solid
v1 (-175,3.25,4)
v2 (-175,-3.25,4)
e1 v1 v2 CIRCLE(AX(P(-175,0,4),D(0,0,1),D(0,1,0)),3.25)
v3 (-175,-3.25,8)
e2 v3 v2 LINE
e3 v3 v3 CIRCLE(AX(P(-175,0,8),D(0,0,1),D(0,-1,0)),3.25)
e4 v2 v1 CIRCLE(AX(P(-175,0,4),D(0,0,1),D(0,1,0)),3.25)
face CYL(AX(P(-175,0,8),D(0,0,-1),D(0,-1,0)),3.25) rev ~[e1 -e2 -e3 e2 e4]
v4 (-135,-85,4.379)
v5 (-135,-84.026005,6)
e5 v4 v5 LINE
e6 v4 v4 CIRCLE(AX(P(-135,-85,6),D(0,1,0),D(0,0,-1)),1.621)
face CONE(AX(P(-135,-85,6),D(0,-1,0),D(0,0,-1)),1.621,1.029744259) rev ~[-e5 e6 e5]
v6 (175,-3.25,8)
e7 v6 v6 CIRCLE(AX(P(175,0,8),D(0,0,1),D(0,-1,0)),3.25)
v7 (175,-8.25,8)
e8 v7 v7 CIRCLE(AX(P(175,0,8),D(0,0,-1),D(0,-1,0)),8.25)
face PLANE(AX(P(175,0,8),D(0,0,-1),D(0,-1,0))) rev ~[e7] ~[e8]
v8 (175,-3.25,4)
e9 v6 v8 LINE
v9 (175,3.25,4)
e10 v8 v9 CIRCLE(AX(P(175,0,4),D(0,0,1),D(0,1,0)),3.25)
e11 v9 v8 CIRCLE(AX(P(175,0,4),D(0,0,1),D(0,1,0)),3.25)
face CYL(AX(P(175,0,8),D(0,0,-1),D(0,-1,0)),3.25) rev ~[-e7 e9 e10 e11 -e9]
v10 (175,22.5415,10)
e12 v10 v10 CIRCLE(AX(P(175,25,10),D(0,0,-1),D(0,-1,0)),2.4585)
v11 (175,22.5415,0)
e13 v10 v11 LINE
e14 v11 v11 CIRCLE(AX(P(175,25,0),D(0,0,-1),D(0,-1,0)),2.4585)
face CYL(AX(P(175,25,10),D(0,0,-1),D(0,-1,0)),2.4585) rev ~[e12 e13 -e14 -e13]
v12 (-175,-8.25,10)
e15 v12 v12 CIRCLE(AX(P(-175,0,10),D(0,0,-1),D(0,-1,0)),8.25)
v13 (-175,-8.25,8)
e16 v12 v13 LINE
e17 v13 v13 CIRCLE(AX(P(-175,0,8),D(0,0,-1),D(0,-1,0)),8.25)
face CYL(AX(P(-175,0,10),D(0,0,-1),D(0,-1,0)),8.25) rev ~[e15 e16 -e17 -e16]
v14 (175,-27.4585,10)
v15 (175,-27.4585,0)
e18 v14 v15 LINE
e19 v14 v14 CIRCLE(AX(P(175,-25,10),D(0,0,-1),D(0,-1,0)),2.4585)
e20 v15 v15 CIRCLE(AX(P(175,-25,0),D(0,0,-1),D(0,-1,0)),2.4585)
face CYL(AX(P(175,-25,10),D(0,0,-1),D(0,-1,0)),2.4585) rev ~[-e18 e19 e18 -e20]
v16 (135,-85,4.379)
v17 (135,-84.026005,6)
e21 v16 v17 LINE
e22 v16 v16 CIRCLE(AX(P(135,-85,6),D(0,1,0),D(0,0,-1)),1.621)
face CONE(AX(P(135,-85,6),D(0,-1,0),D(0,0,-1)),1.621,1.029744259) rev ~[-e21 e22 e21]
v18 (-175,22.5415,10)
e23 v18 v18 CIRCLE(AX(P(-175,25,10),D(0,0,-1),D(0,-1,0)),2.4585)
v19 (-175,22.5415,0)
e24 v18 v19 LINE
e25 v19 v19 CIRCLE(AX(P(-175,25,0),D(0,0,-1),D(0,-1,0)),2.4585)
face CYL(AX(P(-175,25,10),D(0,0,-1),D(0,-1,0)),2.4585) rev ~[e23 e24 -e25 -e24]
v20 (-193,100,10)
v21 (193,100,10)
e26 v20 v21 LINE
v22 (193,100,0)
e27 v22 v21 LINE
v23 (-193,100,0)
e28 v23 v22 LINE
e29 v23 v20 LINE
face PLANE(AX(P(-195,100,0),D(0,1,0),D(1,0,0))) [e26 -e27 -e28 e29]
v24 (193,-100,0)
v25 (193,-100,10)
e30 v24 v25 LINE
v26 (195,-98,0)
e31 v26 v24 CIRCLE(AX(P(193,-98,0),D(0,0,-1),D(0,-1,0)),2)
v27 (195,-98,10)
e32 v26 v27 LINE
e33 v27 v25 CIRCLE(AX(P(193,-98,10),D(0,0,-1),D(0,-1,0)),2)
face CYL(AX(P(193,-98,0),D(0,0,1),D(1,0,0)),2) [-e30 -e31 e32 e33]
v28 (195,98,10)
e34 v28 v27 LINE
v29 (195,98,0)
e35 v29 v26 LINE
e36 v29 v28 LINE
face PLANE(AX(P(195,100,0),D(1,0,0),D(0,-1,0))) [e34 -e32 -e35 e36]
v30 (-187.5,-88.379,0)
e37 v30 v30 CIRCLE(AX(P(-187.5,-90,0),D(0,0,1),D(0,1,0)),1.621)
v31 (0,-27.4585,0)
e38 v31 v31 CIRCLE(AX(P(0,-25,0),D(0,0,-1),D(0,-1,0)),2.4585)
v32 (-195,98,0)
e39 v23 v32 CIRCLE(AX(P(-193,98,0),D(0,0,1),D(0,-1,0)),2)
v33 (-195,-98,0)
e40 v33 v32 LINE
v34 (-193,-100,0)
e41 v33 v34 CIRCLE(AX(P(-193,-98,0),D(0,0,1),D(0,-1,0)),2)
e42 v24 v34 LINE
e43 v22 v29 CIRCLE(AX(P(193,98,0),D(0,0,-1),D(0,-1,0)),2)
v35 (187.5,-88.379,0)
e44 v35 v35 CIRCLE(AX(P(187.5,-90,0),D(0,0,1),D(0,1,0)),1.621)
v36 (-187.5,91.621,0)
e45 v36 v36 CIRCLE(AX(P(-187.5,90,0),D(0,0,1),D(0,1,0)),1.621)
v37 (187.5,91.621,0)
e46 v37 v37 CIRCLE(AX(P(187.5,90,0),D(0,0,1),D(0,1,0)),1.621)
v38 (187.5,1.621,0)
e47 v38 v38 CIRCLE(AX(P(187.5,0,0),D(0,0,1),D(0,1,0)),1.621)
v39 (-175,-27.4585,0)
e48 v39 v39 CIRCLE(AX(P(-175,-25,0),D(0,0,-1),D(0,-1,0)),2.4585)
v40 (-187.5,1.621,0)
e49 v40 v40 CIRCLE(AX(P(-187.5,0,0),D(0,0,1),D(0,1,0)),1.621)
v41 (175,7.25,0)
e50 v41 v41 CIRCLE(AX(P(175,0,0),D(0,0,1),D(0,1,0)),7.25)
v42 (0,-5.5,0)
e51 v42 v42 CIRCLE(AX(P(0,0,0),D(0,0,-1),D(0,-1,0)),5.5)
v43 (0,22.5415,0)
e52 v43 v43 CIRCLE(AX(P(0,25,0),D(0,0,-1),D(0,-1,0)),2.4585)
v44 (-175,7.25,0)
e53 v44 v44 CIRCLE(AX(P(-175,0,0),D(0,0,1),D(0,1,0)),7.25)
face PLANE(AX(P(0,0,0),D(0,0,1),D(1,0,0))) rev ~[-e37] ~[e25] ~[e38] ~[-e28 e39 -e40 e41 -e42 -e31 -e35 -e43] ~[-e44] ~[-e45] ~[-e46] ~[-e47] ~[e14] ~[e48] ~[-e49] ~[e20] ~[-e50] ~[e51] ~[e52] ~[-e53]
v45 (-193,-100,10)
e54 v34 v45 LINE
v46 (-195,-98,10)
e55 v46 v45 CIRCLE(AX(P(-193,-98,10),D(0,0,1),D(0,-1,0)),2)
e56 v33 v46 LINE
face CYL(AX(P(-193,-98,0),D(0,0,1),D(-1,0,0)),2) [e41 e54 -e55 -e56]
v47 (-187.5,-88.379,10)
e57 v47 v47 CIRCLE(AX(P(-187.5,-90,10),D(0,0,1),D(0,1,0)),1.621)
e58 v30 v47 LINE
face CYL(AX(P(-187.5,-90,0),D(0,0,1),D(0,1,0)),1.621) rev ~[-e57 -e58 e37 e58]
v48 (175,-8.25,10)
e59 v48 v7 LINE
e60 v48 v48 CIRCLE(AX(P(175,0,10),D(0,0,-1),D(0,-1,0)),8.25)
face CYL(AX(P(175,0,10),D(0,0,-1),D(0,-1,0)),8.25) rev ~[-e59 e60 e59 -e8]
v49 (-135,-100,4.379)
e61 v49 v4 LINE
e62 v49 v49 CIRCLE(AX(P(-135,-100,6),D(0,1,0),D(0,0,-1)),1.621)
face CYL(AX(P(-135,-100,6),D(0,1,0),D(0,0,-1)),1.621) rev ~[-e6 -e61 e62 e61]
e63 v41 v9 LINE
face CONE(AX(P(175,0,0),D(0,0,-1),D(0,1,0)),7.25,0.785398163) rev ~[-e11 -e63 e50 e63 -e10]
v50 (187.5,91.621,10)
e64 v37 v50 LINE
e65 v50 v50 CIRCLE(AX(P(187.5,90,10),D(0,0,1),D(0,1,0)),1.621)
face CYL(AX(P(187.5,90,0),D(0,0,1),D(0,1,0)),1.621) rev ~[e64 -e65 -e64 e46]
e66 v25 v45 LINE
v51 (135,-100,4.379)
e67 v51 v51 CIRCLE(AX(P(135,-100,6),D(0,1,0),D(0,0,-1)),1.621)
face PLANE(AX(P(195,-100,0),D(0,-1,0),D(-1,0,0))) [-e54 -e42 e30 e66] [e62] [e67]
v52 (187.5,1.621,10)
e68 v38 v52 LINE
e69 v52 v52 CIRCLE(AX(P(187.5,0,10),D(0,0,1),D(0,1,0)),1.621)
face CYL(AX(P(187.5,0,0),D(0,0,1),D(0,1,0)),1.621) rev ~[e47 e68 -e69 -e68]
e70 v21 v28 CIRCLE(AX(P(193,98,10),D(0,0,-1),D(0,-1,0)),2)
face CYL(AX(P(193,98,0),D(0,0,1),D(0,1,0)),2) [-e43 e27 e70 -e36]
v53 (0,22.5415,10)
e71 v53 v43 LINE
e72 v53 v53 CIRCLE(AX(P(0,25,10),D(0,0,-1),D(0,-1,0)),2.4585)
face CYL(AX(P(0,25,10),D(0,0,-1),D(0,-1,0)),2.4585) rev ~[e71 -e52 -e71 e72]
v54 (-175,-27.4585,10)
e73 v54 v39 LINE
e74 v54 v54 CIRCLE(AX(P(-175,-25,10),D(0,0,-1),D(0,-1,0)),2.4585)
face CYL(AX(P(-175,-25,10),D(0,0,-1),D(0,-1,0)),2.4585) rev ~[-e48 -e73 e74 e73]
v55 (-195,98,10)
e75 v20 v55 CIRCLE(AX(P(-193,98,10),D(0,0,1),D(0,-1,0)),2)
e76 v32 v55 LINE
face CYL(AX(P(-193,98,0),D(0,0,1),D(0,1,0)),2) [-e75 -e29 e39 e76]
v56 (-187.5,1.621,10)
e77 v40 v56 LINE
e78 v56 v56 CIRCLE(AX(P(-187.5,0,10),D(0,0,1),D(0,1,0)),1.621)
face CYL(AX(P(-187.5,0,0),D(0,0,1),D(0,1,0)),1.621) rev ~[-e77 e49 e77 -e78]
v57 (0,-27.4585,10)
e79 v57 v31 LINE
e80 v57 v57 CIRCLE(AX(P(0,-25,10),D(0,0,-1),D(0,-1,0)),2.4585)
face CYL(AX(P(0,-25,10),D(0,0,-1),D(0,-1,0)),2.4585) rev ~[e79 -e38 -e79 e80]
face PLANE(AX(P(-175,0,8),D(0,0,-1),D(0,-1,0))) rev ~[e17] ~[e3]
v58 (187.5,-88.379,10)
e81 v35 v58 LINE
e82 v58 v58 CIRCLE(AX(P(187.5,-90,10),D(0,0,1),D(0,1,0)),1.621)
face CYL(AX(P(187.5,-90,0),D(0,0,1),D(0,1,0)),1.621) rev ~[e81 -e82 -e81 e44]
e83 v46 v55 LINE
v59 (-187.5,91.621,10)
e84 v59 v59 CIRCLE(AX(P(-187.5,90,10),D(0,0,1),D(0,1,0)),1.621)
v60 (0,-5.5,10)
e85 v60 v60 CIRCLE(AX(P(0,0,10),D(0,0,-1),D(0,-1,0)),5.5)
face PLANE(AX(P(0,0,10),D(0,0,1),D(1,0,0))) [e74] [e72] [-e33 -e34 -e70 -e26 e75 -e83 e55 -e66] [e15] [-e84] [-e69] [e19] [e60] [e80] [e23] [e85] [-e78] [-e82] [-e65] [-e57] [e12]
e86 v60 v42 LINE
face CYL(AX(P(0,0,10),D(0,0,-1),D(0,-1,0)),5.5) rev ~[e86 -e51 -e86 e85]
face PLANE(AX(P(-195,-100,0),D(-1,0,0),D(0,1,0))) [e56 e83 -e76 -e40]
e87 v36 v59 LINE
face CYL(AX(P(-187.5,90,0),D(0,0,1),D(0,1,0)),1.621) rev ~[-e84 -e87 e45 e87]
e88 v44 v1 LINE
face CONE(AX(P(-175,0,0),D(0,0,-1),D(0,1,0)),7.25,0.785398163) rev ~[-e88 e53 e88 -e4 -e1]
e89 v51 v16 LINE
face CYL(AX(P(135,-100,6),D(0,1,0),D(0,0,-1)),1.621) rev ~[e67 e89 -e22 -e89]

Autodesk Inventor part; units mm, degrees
ref_plane "YZ Plane" through (0, 0, 0) normal (1, 0, 0) x (0, 1, 0)
ref_plane "XZ Plane" through (0, 0, 0) normal (0, 1, 0) x (-1, 0, 0)
ref_plane "XY Plane" through (0, 0, 0) normal (0, 0, 1) x (1, 0, 0)
sketch "Sketch1" plane through (0, 0, 0) normal (0, 0, 1) x (1, 0, 0)
  line L0 (0, -252.5291) -> (0, 252.5291) construction
  line L1 (-273, 0) -> (273, 0) construction
  line L2 (-195, 100) -> (195, 100)
  line L3 (195, 100) -> (195, -100)
  line L4 (195, -100) -> (-195, -100)
  line L5 (-195, -100) -> (-195, 100)
  line L6 (-178.1654, -28.1654) -> (-178.1654, 28.1654) construction
  line L7 (-178.1654, 28.1654) -> (178.1654, 28.1654) construction
  line L8 (178.1654, 28.1654) -> (178.1654, -28.1654) construction
  line L9 (178.1654, -28.1654) -> (-178.1654, -28.1654) construction
  circle A0 centre (0, 0) radius 180.3779 construction
  line L10 (-175, 25) -> (-175, -25) construction
  line L11 (-175, -25) -> (175, -25) construction
  line L12 (175, -25) -> (175, 25) construction
  line L13 (175, 25) -> (-175, 25) construction
  circle A1 centre (-175, 0) radius 6 construction
  point P0 (175, 0)
  point P1 (0, 25)
  point P2 (0, -25)
  dimension "d0" = 390
  dimension "d1" = 200
  dimension "d5" = 350
  dimension "d6" = 360.7559
  dimension "d14" = 350
  dimension "d15" = 12
  dimension "d54" = 353.5534
  dimension "d104" = 350
  dimension "d105" = 50
extrude "Extrusion1" add sketch "Sketch1" along normal blind 10
sketch "Sketch2" plane through (0, 0, 10) normal (0, 0, 1) x (1, 0, 0)
  point P0 (0, 0)
  point P1 (-175, -25)
  point P2 (-175, 25)
  point P3 (175, 25)
  point P4 (175, -25)
  point P5 (-175, 0)
  point P6 (175, 0)
  point P7 (0, 25)
  point P8 (0, -25)
hole "Hole1" at (-175, -25, 10) at (175, 25, 10) at (-175, 25, 10) at (175, -25, 10) at (0, 25, 10) at (0, -25, 10) direction (0, 0, -1) diameter 4.917 end through all thread size "M6x1" class "6H" standard "ISO Metric profile"
hole "Hole2" at (-175, 0, 10) at (175, 0, 10) direction (0, 0, -1) diameter 6.5 end through all counterbore diameter 16.5 counterbore depth 2
sketch "Sketch3" plane through (0, 0, 10) normal (0, 0, 1) x (1, 0, 0)
  line L0 (195, 100) -> (-195, 100) construction
  line L1 (-195, -100) -> (195, -100) construction
  line L2 (-195, 100) -> (-195, -100) construction
  line L3 (-273, 0) -> (273, 0) construction
  line L4 (0, -140) -> (0, 140) construction
  line L5 (195, -100) -> (195, 100) construction
  line L6 (-180, 90) -> (180, 90) construction
  line L7 (180, 90) -> (180, -90) construction
  line L8 (180, -90) -> (-180, -90) construction
  line L9 (-180, -90) -> (-180, 90) construction
  point P0 (0, 0)
  point P1 (-170, 80)
  point P2 (-150, 80)
  point P3 (-150, 80)
  point P4 (-130, 80)
  point P5 (-110, 80)
  point P6 (-90, 80)
  point P7 (-70, 80)
  point P8 (-50, 80)
  point P9 (-30, 80)
  point P10 (-10, 80)
  point P11 (10, 80)
  point P12 (30, 80)
  point P13 (50, 80)
  point P14 (70, 80)
  point P15 (90, 80)
  point P16 (110, 80)
  point P17 (130, 80)
  point P18 (150, 80)
  point P19 (170, 80)
  point P20 (-170, 60)
  point P21 (-150, 60)
  point P22 (-130, 60)
  point P23 (-110, 60)
  point P24 (-90, 60)
  point P25 (-70, 60)
  point P26 (-50, 60)
  point P27 (-30, 60)
  point P28 (-10, 60)
  point P29 (10, 60)
  point P30 (30, 60)
  point P31 (50, 60)
  point P32 (70, 60)
  point P33 (90, 60)
  point P34 (110, 60)
  point P35 (130, 60)
  point P36 (150, 60)
  point P37 (170, 60)
  point P38 (-170, 40)
  point P39 (-150, 40)
  point P40 (-130, 40)
  point P41 (-110, 40)
  point P42 (-90, 40)
  point P43 (-70, 40)
  point P44 (-50, 40)
  point P45 (-30, 40)
  point P46 (-10, 40)
  point P47 (10, 40)
  point P48 (30, 40)
  point P49 (50, 40)
  point P50 (70, 40)
  point P51 (90, 40)
  point P52 (110, 40)
  point P53 (130, 40)
  point P54 (150, 40)
  point P55 (170, 40)
  point P56 (-170, 20)
  point P57 (-150, 20)
  point P58 (-130, 20)
  point P59 (-110, 20)
  point P60 (-90, 20)
  point P61 (-70, 20)
  point P62 (-50, 20)
  point P63 (-30, 20)
  point P64 (-10, 20)
  point P65 (10, 20)
  point P66 (30, 20)
  point P67 (50, 20)
  point P68 (70, 20)
  point P69 (90, 20)
  point P70 (110, 20)
  point P71 (130, 20)
  point P72 (150, 20)
  point P73 (170, 20)
  point P74 (-170, 0)
  point P75 (-150, 0)
  point P76 (-130, 0)
  point P77 (-110, 0)
  point P78 (-90, 0)
  point P79 (-70, 0)
  point P80 (-50, 0)
  point P81 (-30, 0)
  point P82 (-10, 0)
  point P83 (10, 0)
  point P84 (30, 0)
  point P85 (50, 0)
  point P86 (70, 0)
  point P87 (90, 0)
  point P88 (110, 0)
  point P89 (130, 0)
  point P90 (150, 0)
  point P91 (170, 0)
  point P92 (-170, -20)
  point P93 (-150, -20)
  point P94 (-130, -20)
  point P95 (-110, -20)
  point P96 (-90, -20)
  point P97 (-70, -20)
  point P98 (-50, -20)
  point P99 (-30, -20)
  point P100 (-10, -20)
  point P101 (10, -20)
  point P102 (30, -20)
  point P103 (50, -20)
  point P104 (70, -20)
  point P105 (90, -20)
  point P106 (110, -20)
  point P107 (130, -20)
  point P108 (150, -20)
  point P109 (170, -20)
  point P110 (-170, -40)
  point P111 (-150, -40)
  point P112 (-130, -40)
  point P113 (-110, -40)
  point P114 (-90, -40)
  point P115 (-70, -40)
  point P116 (-50, -40)
  point P117 (-30, -40)
  point P118 (-10, -40)
  point P119 (10, -40)
  point P120 (30, -40)
  point P121 (50, -40)
  point P122 (70, -40)
  point P123 (90, -40)
  point P124 (110, -40)
  point P125 (130, -40)
  point P126 (150, -40)
  point P127 (170, -40)
  point P128 (-170, -60)
  point P129 (-150, -60)
  point P130 (-130, -60)
  point P131 (-110, -60)
  point P132 (-90, -60)
  point P133 (-70, -60)
  point P134 (-50, -60)
  point P135 (-30, -60)
  point P136 (-10, -60)
  point P137 (10, -60)
  point P138 (30, -60)
  point P139 (50, -60)
  point P140 (70, -60)
  point P141 (90, -60)
  point P142 (110, -60)
  point P143 (130, -60)
  point P144 (150, -60)
  point P145 (170, -60)
  point P146 (-170, -80)
  point P147 (-150, -80)
  point P148 (-130, -80)
  point P149 (-110, -80)
  point P150 (-90, -80)
  point P151 (-70, -80)
  point P152 (-50, -80)
  point P153 (-30, -80)
  point P154 (-10, -80)
  point P155 (10, -80)
  point P156 (30, -80)
  point P157 (50, -80)
  point P158 (70, -80)
  point P159 (90, -80)
  point P160 (110, -80)
  point P161 (130, -80)
  point P162 (150, -80)
  point P163 (170, -80)
  dimension "d25" = 10
  dimension "d26" = 360
  dimension "d27" = 180
  dimension "d28" = 10
  dimension "d29" = 10
  dimension "d30" = 20
  dimension "d33" = 20
  dimension "d36" = 20
  dimension "d39" = 15
hole "Hole3" [suppressed]
hole "Hole4" at (0, 0, 10) direction (0, 0, -1) diameter 11 end through all
sketch "Sketch4" plane through (0, 0, 0) normal (0, 0, -1) x (-1, 0, 0)
  circle A0 centre (175, 0) radius 3.25 construction
  circle A1 centre (-175, 0) radius 3.25 construction
  line L0 (195, -100) -> (-195, -100) construction
  line L1 (187.5, -100) -> (187.5, 100) construction
  line L2 (-195, 100) -> (195, 100) construction
  line L3 (273, 0) -> (-273, 0) construction
  line L4 (0, -140) -> (0, 140) construction
  line L5 (195, 100) -> (195, -100) construction
  point P0 (0, 0)
  point P1 (187.5, -90)
  point P2 (187.5, 90)
  point P3 (187.5, 0)
  point P4 (-187.5, -90)
  point P5 (-187.5, 90)
  point P6 (-187.5, 0)
  dimension "d62" = 180
  dimension "d63" = 7.5
hole "Hole5" at (-175, 0, 0) at (175, 0, 0) direction (0, 0, 1) diameter 6.5 end through all countersink diameter 14.5 countersink angle 90 clearance for "Countersunk Flat Head Hex Socket Screw ISO 10642" size "M6" standard "ISO"
hole "Hole6" at (-187.5, -90, 0) at (-187.5, 90, 0) at (-187.5, 0, 0) at (187.5, -90, 0) at (187.5, 0, 0) at (187.5, 90, 0) direction (0, 0, 1) diameter 3.242 end through all thread size "M4x0.7" class "6H" standard "ISO Metric profile"
sketch "Sketch10" plane through (-195, -100, 0) normal (0, -1, 0) x (1, 0, 0)
  line L0 (0, 0) -> (0, 10) construction
  line L1 (0, 6) -> (390, 6) construction
  line L2 (390, 0) -> (390, 10) construction
  line L3 (195, -2) -> (195, 12) construction
  line L4 (0, 10) -> (390, 10) construction
  line L5 (0, 0) -> (390, 0) construction
  point P0 (195, 0)
  point P1 (60, 6)
  point P2 (330, 6)
  dimension "d95" = 270
  dimension "d103" = 6
hole "Hole10" at (-135, -100, 6) at (135, -100, 6) direction (0, 1, 0) diameter 3.242 depth 15 tip angle 118 thread size "M4x0.7" class "6H" standard "ISO Metric profile"
fillet "Fillet1" radius 2 4 edges at (-195, -100, 5) (195, -100, 5) (-195, 100, 5) (195, 100, 5)
equation "\"d33\" = d30"
equation "\"d36\" = d30"
properties part number "DLT-01-231B" material "Acrílico TP"
